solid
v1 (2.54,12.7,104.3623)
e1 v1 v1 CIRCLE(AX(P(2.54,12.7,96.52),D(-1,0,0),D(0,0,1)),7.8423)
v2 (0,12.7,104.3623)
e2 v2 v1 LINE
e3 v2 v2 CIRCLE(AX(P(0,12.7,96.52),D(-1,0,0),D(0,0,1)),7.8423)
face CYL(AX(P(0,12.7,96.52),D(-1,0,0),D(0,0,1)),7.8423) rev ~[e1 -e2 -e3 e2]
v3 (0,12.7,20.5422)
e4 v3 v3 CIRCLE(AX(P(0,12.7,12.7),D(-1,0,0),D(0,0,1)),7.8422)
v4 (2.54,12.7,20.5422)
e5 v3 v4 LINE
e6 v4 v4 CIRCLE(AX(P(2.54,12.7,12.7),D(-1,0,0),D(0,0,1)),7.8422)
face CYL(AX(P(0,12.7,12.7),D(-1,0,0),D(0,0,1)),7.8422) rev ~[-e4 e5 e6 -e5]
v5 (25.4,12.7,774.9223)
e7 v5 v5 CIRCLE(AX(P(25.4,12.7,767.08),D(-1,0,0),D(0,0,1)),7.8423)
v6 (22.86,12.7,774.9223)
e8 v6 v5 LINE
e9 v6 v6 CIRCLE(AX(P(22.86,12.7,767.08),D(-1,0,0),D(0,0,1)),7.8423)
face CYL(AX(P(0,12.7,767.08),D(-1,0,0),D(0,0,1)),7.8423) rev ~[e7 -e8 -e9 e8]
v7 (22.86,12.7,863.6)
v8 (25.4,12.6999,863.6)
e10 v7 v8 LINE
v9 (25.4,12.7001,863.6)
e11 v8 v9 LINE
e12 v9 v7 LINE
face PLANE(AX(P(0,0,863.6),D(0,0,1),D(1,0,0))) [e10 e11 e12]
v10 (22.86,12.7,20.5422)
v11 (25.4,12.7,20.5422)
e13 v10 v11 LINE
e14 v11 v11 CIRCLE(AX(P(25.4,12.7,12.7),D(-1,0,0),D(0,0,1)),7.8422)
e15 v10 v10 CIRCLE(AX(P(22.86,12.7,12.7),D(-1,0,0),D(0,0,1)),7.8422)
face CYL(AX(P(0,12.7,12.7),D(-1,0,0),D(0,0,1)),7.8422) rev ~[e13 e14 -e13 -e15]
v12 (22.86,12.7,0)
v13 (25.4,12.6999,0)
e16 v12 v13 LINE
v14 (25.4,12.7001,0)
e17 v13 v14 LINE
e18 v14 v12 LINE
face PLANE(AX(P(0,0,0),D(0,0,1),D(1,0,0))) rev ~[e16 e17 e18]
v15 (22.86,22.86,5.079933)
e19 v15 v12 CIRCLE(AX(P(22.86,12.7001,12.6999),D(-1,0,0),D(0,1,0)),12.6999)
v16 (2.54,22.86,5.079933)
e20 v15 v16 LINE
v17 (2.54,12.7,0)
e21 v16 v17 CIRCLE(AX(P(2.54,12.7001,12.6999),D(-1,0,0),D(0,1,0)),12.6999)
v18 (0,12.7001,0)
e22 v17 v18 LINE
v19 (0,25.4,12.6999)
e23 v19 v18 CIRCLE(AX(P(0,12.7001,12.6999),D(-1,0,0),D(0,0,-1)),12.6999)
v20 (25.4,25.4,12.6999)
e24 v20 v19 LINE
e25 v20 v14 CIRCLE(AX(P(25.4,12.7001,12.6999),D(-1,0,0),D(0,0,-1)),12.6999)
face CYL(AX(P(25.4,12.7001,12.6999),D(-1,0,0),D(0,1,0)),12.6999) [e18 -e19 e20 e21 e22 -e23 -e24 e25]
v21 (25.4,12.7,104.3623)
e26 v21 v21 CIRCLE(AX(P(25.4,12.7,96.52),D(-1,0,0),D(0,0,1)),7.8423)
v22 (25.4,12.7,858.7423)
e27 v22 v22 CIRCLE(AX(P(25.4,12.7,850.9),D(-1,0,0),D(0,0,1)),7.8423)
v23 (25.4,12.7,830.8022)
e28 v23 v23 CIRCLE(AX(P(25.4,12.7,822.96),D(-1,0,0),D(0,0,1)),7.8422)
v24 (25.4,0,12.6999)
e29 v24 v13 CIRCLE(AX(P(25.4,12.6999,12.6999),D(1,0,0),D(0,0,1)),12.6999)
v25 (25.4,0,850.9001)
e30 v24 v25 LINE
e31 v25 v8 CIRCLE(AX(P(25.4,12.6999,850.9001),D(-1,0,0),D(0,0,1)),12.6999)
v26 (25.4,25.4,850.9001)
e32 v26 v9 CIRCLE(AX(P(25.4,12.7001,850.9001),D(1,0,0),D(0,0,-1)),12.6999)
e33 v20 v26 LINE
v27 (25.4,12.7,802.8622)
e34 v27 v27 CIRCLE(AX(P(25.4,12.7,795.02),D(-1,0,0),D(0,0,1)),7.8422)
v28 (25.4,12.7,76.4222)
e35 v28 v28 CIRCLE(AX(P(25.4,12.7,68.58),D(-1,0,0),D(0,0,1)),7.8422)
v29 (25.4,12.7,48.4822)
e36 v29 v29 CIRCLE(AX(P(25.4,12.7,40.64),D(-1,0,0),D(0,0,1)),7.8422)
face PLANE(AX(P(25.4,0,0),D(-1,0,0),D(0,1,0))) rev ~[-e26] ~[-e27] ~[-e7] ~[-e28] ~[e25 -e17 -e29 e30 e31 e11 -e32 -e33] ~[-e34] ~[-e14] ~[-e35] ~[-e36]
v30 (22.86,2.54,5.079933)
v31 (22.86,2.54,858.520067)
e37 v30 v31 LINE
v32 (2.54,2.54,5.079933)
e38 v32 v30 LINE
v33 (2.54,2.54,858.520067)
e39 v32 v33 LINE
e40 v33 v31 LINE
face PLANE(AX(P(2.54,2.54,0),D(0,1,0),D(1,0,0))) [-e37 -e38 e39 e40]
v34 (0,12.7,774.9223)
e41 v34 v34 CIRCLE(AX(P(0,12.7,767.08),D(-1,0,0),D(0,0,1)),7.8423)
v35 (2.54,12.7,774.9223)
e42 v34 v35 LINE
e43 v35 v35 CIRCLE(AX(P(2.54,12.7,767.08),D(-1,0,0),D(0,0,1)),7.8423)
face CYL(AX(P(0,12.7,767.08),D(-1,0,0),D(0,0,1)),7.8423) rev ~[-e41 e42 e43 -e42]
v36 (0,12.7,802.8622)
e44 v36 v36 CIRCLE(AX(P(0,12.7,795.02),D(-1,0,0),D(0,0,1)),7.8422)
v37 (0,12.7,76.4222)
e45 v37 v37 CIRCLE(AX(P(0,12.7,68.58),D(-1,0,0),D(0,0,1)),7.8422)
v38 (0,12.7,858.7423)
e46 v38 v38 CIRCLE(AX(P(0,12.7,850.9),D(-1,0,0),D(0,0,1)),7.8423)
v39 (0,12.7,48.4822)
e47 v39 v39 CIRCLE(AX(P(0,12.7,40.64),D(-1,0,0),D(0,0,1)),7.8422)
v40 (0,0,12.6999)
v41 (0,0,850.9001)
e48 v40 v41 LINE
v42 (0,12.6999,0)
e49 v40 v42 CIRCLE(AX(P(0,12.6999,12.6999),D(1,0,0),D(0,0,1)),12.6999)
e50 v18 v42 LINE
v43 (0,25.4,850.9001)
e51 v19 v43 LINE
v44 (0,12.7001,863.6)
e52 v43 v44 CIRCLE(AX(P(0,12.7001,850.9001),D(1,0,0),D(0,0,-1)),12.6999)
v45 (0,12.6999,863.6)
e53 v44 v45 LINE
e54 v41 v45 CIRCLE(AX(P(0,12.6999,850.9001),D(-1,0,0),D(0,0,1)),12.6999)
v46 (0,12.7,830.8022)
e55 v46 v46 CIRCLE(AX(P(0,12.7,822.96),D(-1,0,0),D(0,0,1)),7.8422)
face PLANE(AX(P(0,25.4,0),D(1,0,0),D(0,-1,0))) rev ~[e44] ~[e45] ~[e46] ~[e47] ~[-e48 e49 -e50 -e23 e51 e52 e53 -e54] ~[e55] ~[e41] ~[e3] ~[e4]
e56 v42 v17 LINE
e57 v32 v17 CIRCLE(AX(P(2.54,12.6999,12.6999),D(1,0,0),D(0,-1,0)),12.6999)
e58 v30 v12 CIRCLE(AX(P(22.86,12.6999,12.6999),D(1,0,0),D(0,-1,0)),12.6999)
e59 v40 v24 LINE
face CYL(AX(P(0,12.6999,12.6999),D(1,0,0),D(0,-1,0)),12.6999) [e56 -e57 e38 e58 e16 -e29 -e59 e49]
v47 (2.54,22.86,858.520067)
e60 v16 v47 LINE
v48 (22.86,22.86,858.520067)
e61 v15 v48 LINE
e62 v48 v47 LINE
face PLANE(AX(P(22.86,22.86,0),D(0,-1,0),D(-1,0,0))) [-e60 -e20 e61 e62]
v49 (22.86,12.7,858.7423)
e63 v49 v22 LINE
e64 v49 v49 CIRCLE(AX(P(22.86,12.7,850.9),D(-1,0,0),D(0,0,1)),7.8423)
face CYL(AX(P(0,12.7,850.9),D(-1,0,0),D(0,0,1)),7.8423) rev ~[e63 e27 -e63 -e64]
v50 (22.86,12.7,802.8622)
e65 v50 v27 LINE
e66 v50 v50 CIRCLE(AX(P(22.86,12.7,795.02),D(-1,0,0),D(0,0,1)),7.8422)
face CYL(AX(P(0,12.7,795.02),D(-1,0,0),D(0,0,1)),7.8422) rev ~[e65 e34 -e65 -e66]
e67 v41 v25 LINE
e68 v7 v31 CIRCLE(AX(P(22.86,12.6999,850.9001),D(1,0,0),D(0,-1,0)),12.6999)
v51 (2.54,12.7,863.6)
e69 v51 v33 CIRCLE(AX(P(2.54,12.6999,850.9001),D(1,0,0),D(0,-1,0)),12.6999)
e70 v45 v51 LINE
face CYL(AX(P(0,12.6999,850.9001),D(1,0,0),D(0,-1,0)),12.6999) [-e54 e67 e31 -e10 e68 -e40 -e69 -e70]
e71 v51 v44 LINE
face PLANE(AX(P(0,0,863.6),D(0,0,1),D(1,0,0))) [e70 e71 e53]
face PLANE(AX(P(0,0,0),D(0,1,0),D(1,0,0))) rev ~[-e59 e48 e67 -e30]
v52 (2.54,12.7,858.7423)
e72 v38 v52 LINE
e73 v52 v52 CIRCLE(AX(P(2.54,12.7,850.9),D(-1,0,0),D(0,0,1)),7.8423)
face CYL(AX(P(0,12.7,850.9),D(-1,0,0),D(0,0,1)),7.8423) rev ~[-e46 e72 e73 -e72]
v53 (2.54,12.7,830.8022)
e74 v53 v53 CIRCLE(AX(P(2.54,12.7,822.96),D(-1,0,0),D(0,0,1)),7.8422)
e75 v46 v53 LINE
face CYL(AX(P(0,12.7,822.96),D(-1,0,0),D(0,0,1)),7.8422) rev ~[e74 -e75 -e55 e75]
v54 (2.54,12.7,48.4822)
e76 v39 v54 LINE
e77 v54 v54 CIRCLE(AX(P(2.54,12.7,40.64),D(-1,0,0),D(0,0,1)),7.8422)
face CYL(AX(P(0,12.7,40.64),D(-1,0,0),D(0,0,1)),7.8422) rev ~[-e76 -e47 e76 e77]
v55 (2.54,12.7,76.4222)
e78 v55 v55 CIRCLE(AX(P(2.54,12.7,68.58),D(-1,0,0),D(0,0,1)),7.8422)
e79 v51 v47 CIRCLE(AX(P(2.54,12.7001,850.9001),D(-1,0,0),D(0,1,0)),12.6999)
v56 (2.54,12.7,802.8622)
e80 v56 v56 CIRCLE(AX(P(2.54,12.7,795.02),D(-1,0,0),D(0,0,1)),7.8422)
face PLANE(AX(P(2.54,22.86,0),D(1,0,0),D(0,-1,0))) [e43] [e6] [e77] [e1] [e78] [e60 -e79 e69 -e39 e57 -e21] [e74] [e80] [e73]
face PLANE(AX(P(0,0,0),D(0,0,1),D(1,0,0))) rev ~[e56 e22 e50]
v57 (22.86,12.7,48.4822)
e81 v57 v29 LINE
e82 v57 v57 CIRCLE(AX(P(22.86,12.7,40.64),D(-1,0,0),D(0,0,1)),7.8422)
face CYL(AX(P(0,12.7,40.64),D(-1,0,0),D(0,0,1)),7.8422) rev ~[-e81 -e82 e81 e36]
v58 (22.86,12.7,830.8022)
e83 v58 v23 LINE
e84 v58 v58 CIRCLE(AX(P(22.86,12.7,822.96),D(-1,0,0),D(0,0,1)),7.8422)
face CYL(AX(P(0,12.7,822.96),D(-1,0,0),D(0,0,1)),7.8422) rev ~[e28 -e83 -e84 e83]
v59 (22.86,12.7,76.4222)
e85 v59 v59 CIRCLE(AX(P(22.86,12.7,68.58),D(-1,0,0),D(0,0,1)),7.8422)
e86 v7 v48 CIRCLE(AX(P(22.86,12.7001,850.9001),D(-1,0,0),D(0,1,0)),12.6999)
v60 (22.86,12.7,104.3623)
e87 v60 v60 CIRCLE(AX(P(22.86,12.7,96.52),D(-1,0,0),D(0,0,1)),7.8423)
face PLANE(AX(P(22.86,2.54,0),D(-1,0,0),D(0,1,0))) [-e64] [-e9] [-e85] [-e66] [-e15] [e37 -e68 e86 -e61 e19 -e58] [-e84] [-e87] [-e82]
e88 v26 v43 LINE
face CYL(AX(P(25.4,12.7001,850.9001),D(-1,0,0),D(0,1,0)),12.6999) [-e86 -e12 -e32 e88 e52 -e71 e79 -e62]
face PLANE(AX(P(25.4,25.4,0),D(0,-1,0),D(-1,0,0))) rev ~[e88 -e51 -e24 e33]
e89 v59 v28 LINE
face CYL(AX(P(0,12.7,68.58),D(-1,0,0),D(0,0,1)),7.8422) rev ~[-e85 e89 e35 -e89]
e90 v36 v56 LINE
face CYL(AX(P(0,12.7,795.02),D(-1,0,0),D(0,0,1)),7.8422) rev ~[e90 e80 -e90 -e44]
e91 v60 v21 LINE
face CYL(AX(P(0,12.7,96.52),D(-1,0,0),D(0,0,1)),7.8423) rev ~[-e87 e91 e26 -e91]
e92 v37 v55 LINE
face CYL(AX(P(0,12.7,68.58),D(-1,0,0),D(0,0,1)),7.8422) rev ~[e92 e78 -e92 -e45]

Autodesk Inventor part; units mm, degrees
ref_plane "YZ Plane" through (0, 0, 0) normal (1, 0, 0) x (0, 1, 0)
ref_plane "XZ Plane" through (0, 0, 0) normal (0, 1, 0) x (-1, 0, 0)
ref_plane "XY Plane" through (0, 0, 0) normal (0, 0, 1) x (1, 0, 0)
sketch "Sketch1" plane through (0, 0, 0) normal (0, 0, 1) x (1, 0, 0)
  line L0 (0, 0) -> (25.4, 0)
  line L1 (25.4, 0) -> (25.4, 25.4)
  line L2 (25.4, 25.4) -> (0, 25.4)
  line L3 (0, 25.4) -> (0, 0)
  dimension "d0" = 25.4
  dimension "d1" = 25.4
extrude "Extrusion1" add sketch "Sketch1" along normal blind 863.6
fillet "Fillet1" radius 12.7 4 edges at (12.7, 25.4, 863.6) (12.7, 0, 863.6) (12.7, 25.4, 0) (12.7, 0, 0)
sketch "Sketch2" plane through (0, 0, 0) normal (0, 0, 1) x (1, 0, 0)
  line L0 (22.86, 22.86) -> (2.54, 22.86)
  line L1 (2.54, 22.86) -> (2.54, 2.54)
  line L2 (2.54, 2.54) -> (22.86, 2.54)
  line L3 (22.86, 2.54) -> (22.86, 22.86)
  line L4 (0, 25.4) -> (25.4, 25.4) projected
  line L5 (0, 0) -> (0, 25.4) projected
  line L6 (25.4, 0) -> (0, 0) projected
  line L7 (25.4, 25.4) -> (25.4, 0) projected
  dimension "d5" = 2.54
  dimension "d6" = 2.54
  dimension "d7" = 2.54
  dimension "d8" = 2.54
extrude "Extrusion2" cut sketch "Sketch2" along normal blind 1016 contours L3 L2 L1 L0
sketch "Sketch3" plane through (0, 12.7, 12.7) normal (-1, 0, 0) x (0, 0, 1)
  circle A0 centre (0, 0) radius 7.8422
  circle A1 centre (27.94, 0) radius 7.8422
  circle A2 centre (55.88, 0) radius 7.8422
  circle A3 centre (83.82, 0) radius 7.8423
  circle A4 centre (838.2, 0) radius 7.8423
  circle A5 centre (810.26, 0) radius 7.8422
  circle A6 centre (782.32, 0) radius 7.8422
  circle A7 centre (754.38, 0) radius 7.8423
  line L0 (0, 12.7) -> (838.2, 12.7)
  arc A8 (0, 12.7) -> (0, -12.7) centre (0, 0) ccw
  arc A9 (838.2, -12.7) -> (838.2, 12.7) centre (838.2, 0) ccw
  point P0 (-12.7, -12.7)
  dimension "d11" = 15.6845
  dimension "d12" = 15.6845
  dimension "d13" = 15.6845
  dimension "d14" = 15.6845
  dimension "d15" = 15.6845
  dimension "d16" = 15.6845
  dimension "d17" = 15.6845
  dimension "d18" = 15.6845
  dimension "d19" = 12.7
  dimension "d20" = 12.7
  dimension "d21" = 12.7
  dimension "d22" = 12.7
  dimension "d23" = 12.7
  dimension "d24" = 12.7
  dimension "d25" = 12.7
  dimension "d26" = 12.7
  dimension "d27" = 0
  dimension "d28" = 27.94
  dimension "d29" = 27.94
  dimension "d30" = 27.94
  dimension "d31" = 0
  dimension "d32" = 27.94
  dimension "d33" = 27.94
  dimension "d34" = 27.94
extrude "Extrusion3" cut sketch "Sketch3" against normal blind 25.4
equation "\"d29\" = d28"
equation "\"d30\" = d28"
equation "\"d33\" = d32"
equation "\"d34\" = d32"
properties part number "Support Pivs 25 uppermiddle"
